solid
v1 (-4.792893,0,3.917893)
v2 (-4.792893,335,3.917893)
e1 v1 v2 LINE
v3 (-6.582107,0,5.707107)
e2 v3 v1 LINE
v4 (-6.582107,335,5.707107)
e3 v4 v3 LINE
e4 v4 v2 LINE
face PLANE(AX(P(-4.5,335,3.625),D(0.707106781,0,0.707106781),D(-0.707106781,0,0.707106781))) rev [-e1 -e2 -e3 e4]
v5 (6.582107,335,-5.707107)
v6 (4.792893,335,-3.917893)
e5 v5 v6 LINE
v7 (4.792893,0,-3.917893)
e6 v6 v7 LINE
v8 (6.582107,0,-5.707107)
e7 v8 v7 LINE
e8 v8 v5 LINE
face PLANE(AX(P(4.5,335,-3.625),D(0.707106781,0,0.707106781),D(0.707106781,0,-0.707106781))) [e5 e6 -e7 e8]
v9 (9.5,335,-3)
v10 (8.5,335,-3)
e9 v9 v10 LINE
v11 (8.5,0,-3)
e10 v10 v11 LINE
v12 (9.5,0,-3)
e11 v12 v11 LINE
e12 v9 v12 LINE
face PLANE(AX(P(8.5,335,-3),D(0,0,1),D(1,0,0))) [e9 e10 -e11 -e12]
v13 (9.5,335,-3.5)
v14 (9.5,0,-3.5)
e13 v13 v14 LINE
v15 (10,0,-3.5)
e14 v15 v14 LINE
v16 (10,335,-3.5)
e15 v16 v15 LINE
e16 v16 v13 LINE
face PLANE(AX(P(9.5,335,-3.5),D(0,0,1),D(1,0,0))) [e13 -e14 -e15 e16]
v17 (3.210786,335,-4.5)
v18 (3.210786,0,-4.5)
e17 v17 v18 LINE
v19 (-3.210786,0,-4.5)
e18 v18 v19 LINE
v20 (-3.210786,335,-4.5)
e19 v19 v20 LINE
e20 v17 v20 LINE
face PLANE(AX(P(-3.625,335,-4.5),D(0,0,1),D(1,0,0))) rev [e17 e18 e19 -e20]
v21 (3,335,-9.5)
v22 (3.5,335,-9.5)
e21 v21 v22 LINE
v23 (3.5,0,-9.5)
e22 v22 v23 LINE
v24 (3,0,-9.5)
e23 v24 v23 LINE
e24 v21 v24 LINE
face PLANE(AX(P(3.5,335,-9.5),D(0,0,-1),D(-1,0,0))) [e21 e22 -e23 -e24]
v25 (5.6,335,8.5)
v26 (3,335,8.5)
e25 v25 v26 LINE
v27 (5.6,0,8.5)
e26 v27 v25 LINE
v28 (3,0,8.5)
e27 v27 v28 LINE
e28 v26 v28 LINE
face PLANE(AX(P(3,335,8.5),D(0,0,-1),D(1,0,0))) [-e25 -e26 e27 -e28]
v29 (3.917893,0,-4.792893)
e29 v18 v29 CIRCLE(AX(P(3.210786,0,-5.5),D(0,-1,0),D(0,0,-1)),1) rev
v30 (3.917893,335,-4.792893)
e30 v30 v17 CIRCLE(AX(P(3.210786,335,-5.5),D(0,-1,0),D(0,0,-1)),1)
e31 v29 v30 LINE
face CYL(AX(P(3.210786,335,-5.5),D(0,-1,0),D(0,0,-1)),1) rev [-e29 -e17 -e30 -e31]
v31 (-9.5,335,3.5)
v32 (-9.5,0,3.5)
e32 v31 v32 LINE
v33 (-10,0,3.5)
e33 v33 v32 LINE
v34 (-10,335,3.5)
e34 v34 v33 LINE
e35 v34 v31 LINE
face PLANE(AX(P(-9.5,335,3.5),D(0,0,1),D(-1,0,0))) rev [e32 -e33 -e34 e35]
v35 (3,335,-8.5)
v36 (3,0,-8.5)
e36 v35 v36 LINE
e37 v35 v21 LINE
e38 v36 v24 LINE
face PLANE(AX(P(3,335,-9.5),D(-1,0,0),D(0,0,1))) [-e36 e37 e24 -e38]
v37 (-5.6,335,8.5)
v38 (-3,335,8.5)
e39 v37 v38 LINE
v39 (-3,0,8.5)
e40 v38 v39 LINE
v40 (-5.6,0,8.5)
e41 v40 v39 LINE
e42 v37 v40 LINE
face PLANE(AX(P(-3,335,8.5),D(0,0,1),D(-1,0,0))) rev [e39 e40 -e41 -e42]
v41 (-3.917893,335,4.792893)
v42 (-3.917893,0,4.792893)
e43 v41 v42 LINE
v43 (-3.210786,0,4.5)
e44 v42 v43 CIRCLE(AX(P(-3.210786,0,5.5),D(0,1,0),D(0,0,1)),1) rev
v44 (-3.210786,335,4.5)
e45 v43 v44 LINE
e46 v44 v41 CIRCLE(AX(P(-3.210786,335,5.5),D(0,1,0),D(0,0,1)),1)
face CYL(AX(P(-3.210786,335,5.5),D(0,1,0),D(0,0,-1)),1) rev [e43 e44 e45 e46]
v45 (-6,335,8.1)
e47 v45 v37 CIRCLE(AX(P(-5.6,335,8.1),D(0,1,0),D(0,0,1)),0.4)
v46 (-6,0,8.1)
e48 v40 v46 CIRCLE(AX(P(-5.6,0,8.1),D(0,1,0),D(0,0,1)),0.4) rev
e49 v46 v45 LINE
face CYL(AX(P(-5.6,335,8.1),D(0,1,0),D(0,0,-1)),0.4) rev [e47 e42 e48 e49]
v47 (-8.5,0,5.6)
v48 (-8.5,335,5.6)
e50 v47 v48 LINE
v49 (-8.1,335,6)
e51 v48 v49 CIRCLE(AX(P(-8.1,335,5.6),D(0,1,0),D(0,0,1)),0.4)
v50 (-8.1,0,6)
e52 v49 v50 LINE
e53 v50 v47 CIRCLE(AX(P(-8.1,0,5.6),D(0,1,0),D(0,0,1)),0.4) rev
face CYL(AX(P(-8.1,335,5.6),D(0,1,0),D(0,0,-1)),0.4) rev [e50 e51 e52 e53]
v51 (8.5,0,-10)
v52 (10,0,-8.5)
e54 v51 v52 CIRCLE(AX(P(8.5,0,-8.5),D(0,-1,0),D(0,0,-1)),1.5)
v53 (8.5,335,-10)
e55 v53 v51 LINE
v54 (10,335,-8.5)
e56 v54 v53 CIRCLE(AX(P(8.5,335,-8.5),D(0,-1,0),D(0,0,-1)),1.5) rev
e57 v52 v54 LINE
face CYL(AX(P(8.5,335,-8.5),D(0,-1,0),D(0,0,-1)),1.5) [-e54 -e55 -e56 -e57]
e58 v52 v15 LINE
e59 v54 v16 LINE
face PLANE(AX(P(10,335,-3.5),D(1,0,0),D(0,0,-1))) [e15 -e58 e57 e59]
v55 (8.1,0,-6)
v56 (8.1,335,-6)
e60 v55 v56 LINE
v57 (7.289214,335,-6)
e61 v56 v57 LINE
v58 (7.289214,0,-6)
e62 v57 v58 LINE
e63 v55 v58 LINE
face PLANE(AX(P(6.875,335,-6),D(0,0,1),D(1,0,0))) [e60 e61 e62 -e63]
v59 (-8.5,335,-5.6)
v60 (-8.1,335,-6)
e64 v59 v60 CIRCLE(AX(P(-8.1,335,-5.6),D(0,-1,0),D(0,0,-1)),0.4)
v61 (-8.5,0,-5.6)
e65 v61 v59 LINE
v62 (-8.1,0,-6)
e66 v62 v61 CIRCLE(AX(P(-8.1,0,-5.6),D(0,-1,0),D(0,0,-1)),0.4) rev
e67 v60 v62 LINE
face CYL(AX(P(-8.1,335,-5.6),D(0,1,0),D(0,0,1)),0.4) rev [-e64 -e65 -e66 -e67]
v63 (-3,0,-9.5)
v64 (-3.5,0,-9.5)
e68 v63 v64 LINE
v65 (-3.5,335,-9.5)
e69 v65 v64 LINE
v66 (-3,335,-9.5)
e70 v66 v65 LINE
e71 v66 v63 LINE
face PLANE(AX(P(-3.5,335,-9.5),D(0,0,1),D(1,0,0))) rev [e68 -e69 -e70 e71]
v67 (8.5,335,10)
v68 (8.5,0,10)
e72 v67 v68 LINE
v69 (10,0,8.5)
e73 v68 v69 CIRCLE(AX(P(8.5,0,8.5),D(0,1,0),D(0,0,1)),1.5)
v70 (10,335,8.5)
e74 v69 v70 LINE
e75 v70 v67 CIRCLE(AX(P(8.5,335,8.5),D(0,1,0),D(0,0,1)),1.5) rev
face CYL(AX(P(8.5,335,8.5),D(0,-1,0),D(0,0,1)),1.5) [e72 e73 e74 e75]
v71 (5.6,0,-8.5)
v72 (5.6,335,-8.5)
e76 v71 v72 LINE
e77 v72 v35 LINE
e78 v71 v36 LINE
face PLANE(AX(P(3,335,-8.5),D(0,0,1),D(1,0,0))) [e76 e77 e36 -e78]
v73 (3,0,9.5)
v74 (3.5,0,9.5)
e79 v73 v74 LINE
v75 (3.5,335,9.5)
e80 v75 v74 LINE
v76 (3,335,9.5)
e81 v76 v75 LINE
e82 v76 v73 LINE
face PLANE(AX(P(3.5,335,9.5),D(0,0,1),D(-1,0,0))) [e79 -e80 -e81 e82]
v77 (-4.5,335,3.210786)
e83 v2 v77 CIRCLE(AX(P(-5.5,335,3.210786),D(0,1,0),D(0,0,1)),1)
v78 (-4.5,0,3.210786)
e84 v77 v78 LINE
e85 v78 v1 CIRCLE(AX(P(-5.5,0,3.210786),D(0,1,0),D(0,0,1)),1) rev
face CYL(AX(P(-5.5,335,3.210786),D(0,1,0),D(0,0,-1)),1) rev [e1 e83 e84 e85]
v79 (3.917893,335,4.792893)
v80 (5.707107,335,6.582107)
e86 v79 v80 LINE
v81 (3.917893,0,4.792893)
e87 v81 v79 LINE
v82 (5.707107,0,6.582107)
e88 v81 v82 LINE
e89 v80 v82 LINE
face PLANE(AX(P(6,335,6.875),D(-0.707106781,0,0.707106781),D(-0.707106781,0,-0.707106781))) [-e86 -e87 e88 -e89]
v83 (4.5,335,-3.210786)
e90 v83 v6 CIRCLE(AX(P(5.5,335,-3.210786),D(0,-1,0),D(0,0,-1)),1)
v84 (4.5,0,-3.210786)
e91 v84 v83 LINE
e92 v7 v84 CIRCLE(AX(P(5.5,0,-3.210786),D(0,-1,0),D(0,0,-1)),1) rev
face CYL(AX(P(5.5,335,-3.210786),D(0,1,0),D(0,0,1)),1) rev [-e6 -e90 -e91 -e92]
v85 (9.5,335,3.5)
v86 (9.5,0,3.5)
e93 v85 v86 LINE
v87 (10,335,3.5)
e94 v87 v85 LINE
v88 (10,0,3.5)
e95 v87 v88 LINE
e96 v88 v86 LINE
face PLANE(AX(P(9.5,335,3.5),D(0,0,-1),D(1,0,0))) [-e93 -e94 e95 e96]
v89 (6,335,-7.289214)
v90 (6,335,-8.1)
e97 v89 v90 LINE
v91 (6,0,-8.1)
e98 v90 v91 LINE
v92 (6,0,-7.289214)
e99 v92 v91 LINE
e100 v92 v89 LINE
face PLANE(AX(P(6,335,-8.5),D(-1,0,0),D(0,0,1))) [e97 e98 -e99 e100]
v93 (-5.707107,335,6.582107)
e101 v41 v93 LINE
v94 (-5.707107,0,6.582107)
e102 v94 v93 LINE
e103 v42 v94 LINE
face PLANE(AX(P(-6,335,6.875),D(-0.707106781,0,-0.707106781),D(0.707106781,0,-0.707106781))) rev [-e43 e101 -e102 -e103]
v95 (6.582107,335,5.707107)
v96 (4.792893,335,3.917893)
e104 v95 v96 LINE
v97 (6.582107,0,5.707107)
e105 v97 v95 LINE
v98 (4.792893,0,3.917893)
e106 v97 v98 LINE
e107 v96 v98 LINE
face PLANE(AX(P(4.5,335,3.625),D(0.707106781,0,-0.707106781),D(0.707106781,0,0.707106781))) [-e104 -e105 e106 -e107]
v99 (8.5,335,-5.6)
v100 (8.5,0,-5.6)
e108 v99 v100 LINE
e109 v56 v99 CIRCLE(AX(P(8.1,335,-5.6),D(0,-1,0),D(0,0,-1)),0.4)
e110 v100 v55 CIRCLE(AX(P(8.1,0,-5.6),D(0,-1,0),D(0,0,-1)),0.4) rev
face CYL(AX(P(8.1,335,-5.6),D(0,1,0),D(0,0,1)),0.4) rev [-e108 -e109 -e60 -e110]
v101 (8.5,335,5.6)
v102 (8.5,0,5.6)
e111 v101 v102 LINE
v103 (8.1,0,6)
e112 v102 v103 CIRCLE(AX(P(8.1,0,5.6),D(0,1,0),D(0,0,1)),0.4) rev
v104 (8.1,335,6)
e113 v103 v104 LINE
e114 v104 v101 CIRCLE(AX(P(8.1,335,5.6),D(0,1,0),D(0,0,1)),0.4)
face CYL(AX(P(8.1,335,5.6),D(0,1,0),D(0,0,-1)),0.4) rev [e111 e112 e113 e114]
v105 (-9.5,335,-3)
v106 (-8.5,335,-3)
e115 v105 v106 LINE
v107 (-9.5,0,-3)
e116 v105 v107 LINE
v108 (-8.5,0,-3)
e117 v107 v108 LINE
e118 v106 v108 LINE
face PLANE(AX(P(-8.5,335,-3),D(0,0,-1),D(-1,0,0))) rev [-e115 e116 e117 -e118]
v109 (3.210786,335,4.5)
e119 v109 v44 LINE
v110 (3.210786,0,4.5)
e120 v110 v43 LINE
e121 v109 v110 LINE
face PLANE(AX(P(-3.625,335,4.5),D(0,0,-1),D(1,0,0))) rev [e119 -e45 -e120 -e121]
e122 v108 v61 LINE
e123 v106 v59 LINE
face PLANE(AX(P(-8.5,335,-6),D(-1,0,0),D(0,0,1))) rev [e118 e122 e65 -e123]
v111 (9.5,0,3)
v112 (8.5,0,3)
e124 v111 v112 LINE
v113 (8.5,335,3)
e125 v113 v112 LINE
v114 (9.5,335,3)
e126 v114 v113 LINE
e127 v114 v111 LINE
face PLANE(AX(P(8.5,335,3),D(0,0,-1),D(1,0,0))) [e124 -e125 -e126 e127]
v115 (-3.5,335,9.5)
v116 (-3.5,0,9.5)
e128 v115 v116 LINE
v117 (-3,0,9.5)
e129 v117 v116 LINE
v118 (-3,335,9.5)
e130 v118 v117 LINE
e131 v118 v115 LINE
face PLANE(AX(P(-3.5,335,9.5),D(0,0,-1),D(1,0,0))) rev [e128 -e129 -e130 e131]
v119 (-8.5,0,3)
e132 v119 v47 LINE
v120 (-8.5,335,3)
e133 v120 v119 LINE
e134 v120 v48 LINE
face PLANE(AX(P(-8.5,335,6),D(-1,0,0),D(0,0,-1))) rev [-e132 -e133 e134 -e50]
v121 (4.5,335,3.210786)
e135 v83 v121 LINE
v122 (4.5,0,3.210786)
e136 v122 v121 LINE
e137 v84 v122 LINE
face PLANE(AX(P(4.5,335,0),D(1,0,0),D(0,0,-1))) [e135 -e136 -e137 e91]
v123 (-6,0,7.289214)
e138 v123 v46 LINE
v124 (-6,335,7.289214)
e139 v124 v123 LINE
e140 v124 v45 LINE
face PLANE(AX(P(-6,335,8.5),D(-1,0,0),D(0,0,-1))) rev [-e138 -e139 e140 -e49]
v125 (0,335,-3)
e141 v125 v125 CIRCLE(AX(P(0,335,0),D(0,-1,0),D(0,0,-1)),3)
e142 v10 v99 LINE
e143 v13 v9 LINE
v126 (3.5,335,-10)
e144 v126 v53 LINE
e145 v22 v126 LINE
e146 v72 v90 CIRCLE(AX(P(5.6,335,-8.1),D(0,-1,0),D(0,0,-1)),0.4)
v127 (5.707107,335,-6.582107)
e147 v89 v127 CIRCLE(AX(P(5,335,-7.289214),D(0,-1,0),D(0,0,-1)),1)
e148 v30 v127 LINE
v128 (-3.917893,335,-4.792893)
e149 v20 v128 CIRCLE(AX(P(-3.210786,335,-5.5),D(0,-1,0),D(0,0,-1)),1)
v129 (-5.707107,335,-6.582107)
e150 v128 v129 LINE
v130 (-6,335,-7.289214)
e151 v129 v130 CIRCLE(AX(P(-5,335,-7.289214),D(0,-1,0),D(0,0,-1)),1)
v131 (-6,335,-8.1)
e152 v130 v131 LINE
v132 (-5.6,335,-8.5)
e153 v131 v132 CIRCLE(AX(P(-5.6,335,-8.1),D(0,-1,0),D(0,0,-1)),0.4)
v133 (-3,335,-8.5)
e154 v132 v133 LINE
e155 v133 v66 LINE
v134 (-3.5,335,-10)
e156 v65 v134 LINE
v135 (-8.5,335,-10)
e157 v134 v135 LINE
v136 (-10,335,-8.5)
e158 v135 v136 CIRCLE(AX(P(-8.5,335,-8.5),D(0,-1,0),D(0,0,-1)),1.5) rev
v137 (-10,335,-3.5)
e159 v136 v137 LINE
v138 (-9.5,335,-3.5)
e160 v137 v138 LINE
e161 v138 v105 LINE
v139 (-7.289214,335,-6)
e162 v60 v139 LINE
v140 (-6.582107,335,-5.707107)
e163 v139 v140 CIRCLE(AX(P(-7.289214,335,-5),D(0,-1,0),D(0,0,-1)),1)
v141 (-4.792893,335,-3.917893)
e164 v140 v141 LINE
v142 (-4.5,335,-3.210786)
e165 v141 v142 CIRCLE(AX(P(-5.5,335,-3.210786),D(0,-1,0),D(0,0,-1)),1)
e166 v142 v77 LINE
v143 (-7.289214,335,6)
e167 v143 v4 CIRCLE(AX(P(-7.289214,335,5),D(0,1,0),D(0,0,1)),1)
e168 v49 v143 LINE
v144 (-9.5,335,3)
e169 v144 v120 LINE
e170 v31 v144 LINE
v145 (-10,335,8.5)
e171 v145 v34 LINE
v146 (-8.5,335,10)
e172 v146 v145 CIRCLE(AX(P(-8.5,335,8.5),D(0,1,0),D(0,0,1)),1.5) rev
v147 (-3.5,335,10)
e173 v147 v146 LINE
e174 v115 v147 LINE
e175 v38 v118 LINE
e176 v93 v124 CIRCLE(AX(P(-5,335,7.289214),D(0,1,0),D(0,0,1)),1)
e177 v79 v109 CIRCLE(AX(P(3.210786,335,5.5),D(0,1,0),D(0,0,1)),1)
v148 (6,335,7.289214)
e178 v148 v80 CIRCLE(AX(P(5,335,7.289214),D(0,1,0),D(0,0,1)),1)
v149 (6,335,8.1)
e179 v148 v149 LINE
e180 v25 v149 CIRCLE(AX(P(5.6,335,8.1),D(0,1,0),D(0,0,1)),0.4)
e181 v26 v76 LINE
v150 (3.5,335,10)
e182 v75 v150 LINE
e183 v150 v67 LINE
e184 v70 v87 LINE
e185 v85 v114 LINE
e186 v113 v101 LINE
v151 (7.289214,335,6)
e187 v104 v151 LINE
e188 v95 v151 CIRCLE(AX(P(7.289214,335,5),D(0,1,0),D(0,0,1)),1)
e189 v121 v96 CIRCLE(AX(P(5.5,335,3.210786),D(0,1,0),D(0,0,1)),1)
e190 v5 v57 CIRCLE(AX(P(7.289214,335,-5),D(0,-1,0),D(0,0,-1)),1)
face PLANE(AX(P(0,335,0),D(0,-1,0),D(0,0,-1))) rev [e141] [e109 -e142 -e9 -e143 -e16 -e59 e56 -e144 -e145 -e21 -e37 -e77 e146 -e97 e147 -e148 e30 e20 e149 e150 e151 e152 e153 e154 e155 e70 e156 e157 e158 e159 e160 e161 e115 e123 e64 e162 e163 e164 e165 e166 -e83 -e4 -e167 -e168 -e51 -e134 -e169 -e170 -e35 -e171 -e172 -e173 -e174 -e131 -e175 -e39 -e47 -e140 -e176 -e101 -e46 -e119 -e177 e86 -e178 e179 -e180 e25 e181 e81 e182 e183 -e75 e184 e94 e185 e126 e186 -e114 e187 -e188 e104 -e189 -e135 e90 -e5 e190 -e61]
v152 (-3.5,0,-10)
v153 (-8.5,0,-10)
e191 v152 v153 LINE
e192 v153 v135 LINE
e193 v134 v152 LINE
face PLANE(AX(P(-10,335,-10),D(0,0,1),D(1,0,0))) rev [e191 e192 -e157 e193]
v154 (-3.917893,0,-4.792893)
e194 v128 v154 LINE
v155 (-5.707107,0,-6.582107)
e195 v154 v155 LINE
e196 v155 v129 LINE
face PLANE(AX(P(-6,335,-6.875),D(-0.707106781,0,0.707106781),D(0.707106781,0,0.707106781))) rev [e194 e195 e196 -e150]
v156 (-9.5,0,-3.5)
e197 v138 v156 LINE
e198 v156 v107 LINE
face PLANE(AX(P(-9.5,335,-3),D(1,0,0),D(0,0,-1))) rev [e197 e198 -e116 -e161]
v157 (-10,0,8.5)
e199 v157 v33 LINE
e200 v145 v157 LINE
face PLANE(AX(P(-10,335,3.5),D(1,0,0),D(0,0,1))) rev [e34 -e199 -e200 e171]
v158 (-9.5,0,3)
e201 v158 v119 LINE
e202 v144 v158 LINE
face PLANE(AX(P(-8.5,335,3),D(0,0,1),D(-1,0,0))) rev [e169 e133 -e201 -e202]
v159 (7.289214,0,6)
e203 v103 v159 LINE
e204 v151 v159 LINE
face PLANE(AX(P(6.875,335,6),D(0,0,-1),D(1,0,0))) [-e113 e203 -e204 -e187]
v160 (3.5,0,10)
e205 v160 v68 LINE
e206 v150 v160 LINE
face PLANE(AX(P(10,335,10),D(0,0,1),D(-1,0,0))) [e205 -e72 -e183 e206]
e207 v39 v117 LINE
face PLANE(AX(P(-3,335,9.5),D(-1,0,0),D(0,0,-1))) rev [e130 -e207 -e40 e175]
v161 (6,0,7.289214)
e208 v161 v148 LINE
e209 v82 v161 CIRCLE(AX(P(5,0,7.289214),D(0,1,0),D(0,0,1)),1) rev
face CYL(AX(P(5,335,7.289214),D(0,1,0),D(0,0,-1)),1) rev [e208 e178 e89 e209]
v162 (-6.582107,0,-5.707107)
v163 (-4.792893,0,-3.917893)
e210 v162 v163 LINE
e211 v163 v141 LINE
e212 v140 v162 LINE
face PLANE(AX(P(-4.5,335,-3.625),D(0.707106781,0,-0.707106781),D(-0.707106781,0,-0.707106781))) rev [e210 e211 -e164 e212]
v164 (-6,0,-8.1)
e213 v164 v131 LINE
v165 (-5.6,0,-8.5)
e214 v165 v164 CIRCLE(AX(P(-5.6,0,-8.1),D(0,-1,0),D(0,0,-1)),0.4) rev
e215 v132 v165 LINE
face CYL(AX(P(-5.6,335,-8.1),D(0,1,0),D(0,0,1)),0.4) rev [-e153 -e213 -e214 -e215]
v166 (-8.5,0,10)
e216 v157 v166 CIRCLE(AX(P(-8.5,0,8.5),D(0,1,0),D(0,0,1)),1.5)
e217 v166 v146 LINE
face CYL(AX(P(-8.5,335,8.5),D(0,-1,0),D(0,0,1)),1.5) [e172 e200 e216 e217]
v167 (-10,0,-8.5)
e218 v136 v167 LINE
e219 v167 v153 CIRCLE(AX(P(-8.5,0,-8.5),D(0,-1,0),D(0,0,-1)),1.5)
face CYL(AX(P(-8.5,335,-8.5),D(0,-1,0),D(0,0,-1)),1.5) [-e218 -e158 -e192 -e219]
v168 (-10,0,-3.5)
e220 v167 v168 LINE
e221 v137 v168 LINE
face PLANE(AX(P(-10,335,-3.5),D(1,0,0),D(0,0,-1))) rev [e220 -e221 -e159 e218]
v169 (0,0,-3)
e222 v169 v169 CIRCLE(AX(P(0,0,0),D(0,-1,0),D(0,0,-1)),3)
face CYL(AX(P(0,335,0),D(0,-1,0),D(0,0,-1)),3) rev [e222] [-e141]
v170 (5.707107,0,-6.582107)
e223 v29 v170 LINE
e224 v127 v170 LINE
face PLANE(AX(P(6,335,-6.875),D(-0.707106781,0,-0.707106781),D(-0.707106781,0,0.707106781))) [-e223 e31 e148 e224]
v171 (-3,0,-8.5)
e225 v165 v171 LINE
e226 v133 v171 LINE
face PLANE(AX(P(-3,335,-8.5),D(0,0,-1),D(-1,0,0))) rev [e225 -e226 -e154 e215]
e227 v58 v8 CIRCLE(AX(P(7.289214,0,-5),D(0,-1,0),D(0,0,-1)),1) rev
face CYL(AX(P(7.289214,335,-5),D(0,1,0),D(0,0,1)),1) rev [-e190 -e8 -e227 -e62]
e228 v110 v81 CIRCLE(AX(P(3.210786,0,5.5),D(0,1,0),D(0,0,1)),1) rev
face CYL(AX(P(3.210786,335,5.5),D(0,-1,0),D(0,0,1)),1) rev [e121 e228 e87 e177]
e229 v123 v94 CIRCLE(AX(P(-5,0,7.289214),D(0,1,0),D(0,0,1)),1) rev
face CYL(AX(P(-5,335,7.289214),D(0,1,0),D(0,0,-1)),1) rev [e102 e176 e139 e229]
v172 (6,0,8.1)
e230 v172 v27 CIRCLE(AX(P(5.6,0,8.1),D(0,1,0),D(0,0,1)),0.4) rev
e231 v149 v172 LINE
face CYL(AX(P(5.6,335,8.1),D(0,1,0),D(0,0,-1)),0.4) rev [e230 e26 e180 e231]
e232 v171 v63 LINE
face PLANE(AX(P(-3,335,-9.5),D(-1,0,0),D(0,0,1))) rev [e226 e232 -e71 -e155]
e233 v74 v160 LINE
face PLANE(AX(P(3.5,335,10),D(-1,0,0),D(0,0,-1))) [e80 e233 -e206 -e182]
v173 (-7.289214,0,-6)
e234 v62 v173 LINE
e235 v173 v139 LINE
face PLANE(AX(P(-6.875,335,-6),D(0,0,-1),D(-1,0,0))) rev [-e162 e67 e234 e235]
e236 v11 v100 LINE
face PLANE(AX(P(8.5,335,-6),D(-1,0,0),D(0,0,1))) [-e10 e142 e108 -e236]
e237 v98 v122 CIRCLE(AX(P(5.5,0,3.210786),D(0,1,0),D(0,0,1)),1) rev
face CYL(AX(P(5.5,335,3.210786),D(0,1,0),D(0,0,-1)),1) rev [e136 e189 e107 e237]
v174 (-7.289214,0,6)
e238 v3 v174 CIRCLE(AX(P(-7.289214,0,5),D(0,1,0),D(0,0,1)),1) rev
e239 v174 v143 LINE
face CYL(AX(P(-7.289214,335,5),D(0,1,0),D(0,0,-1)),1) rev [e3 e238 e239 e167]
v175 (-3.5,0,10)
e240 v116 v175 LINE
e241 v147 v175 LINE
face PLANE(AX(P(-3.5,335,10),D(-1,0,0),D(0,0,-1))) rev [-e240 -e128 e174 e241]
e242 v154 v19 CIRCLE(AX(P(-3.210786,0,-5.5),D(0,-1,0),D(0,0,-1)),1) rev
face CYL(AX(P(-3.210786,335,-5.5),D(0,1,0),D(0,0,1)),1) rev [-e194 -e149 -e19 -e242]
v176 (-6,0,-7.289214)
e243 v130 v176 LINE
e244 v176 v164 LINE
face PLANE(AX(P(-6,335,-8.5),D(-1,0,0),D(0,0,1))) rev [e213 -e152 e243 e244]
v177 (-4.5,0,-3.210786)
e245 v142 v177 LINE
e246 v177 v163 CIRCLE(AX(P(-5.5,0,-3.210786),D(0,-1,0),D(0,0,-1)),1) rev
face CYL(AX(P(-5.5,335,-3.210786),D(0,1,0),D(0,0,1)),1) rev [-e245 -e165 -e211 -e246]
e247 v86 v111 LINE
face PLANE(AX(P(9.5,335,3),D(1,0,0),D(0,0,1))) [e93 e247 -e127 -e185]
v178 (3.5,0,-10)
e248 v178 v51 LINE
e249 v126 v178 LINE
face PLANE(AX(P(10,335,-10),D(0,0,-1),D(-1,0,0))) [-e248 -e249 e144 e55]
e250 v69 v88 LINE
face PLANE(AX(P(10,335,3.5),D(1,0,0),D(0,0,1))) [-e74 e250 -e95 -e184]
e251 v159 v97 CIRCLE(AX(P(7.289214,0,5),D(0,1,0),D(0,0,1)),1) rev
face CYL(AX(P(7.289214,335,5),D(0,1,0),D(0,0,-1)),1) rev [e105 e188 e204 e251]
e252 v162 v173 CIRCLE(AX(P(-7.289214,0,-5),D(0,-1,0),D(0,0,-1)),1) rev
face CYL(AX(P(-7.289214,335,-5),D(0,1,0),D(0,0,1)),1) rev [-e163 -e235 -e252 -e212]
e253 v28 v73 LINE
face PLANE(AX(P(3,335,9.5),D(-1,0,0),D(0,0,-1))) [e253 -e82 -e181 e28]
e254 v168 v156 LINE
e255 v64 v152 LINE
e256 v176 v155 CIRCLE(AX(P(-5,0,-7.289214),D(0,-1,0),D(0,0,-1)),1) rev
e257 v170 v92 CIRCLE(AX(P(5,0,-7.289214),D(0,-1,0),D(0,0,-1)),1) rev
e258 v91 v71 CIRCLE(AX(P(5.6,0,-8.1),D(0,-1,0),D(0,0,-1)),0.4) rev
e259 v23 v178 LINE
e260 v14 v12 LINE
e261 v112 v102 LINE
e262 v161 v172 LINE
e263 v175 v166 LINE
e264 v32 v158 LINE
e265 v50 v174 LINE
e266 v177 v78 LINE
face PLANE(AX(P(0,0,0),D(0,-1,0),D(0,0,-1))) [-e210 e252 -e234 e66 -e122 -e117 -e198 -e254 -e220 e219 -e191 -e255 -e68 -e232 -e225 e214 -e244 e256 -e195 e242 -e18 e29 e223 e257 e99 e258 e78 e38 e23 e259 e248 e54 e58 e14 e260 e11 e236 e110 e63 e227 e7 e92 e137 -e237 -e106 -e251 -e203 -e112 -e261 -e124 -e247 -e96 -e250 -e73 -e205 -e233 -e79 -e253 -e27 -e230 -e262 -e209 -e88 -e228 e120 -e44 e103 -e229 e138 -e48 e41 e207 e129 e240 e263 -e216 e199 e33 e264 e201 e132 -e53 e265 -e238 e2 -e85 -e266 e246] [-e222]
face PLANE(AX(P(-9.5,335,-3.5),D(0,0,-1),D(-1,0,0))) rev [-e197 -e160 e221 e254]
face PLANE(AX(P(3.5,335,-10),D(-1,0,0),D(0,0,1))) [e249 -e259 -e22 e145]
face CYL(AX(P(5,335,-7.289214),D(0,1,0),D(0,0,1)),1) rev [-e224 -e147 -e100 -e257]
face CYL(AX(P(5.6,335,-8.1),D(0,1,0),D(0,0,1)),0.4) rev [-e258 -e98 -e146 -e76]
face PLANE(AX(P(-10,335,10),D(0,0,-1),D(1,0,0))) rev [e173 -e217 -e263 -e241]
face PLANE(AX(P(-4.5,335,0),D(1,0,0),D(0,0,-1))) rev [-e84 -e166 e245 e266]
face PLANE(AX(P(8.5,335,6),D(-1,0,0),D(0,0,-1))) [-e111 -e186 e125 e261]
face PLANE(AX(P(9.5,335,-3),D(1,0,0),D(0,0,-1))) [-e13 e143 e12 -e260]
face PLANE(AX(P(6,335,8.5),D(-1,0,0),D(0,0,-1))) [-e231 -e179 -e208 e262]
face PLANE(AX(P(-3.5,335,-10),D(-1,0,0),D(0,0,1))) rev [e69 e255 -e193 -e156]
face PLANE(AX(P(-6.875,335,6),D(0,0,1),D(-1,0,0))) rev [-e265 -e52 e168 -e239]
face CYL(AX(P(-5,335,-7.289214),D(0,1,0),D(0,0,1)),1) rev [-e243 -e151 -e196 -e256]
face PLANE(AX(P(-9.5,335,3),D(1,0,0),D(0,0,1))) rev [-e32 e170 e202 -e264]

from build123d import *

# Parameters (mm, degrees)
BOSS_EXTRU_1_CORPS_DEPTH    = 335
CONG_1_R                    = 1.5
CONG_2_R                    = 0.4
CONG_4_R                    = 1
CONG_1_OF_SYM_TRIE_BRAS_R   = 1.5
CONG_2_OF_SYM_TRIE_BRAS_R   = 0.4
CONG_4_OF_SYM_TRIE_BRAS_R   = 1
SYM_TRIE_BRAS_DOUBLE_DEPTH  = 335
APR_S_TARODAGE_M6_R         = 3
ENL_V_MAT_FILETAGE_M6_DEPTH = 336.298374586


# Read off the part's stored shape, not the designer's step: Symétrie Bras double
with BuildPart() as part:
    # Esquisse4 → Boss.-Extru.1 Corps (new body)
    with BuildSketch(Plane(origin=(0, 0, 0), x_dir=(1, 0, 0), z_dir=(0, 1, 0))):
        Polygon((0, 0), (-4.5, 0), (-4.5, 3.625), (-6.875, 6), (-8.5, 6), (-8.5, 3), (-9.5, 3), (-9.5, 3.5), (-10, 3.5), (-10, 10), (-3.5, 10), (-3.5, 9.5), (-3, 9.5), (-3, 8.5), (-6, 8.5), (-6, 6.875), (-3.625, 4.5), (0, 4.5), align=None)
    boss_extru_1_corps = extrude(amount=BOSS_EXTRU_1_CORPS_DEPTH)

    # Congé1
    cong_1_edges = [part.edges().sort_by_distance(p)[0] for p in [
        (-10, 167.5, -10),
    ]]
    fillet(cong_1_edges, radius=CONG_1_R)

    # Congé2
    cong_2_edges = [part.edges().sort_by_distance(p)[0] for p in [
        (-8.5, 167.5, -6),
        (-6, 167.5, -8.5),
    ]]
    fillet(cong_2_edges, radius=CONG_2_R)

    # Congé4
    cong_4_edges = [part.edges().sort_by_distance(p)[0] for p in [
        (-4.5, 167.5, -3.625),
        (-6.875, 167.5, -6),
        (-6, 167.5, -6.875),
        (-3.625, 167.5, -4.5),
    ]]
    fillet(cong_4_edges, radius=CONG_4_R)

    # Symétrie Bras: Boss.-Extru.1 Corps across plane
    add(boss_extru_1_corps.mirror(Plane(origin=(0, 335, -4.5), x_dir=(0, 0, 1), z_dir=(-1, 0, 0))))

    # Congé1 of Symétrie Bras
    cong_1_of_sym_trie_bras_edges = [part.edges().sort_by_distance(p)[0] for p in [
        (10, 167.5, -10),
    ]]
    fillet(cong_1_of_sym_trie_bras_edges, radius=CONG_1_OF_SYM_TRIE_BRAS_R)

    # Congé2 of Symétrie Bras
    cong_2_of_sym_trie_bras_edges = [part.edges().sort_by_distance(p)[0] for p in [
        (8.5, 167.5, -6),
        (6, 167.5, -8.5),
    ]]
    fillet(cong_2_of_sym_trie_bras_edges, radius=CONG_2_OF_SYM_TRIE_BRAS_R)

    # Congé4 of Symétrie Bras
    cong_4_of_sym_trie_bras_edges = [part.edges().sort_by_distance(p)[0] for p in [
        (4.5, 167.5, -3.625),
        (6.875, 167.5, -6),
        (6, 167.5, -6.875),
        (3.625, 167.5, -4.5),
    ]]
    fillet(cong_4_of_sym_trie_bras_edges, radius=CONG_4_OF_SYM_TRIE_BRAS_R)

    # Symétrie Bras double outline → Symétrie Bras double (add)
    with BuildSketch(Plane(origin=(0, 0, 0), x_dir=(1, 0, 0), z_dir=(0, 1, 0))):
        with BuildLine():
            ThreePointArc((7.289213562, -6), (6.90653013, -5.923879533), (6.582106781, -5.707106781))
            Line((6.582106781, -5.707106781), (4.792893219, -3.917893219))
            ThreePointArc((4.792893219, -3.917893219), (4.576120467, -3.59346987), (4.5, -3.210786438))
            Line((4.5, -3.210786438), (4.5, 0))
            Line((4.5, 0), (-4.5, 0))
            Line((-4.5, 0), (-4.5, -3.210786438))
            ThreePointArc((-4.5, -3.210786438), (-4.576120467, -3.59346987), (-4.792893219, -3.917893219))
            Line((-4.792893219, -3.917893219), (-6.582106781, -5.707106781))
            ThreePointArc((-6.582106781, -5.707106781), (-6.90653013, -5.923879533), (-7.289213562, -6))
            Line((-7.289213562, -6), (-8.1, -6))
            ThreePointArc((-8.1, -6), (-8.382842712, -5.882842712), (-8.5, -5.6))
            Line((-8.5, -5.6), (-8.5, -3))
            Line((-8.5, -3), (-9.5, -3))
            Line((-9.5, -3), (-9.5, -3.5))
            Line((-9.5, -3.5), (-10, -3.5))
            Line((-10, -3.5), (-10, -8.5))
            ThreePointArc((-10, -8.5), (-9.560660172, -9.560660172), (-8.5, -10))
            Line((-8.5, -10), (-3.5, -10))
            Line((-3.5, -10), (-3.5, -9.5))
            Line((-3.5, -9.5), (-3, -9.5))
            Line((-3, -9.5), (-3, -8.5))
            Line((-3, -8.5), (-5.6, -8.5))
            ThreePointArc((-5.6, -8.5), (-5.882842712, -8.382842712), (-6, -8.1))
            Line((-6, -8.1), (-6, -7.289213562))
            ThreePointArc((-6, -7.289213562), (-5.923879533, -6.90653013), (-5.707106781, -6.582106781))
            Line((-5.707106781, -6.582106781), (-3.917893219, -4.792893219))
            ThreePointArc((-3.917893219, -4.792893219), (-3.59346987, -4.576120467), (-3.210786438, -4.5))
            Line((-3.210786438, -4.5), (3.210786438, -4.5))
            ThreePointArc((3.210786438, -4.5), (3.59346987, -4.576120467), (3.917893219, -4.792893219))
            Line((3.917893219, -4.792893219), (5.707106781, -6.582106781))
            ThreePointArc((5.707106781, -6.582106781), (5.923879533, -6.90653013), (6, -7.289213562))
            Line((6, -7.289213562), (6, -8.1))
            ThreePointArc((6, -8.1), (5.882842712, -8.382842712), (5.6, -8.5))
            Line((5.6, -8.5), (3, -8.5))
            Line((3, -8.5), (3, -9.5))
            Line((3, -9.5), (3.5, -9.5))
            Line((3.5, -9.5), (3.5, -10))
            Line((3.5, -10), (8.5, -10))
            ThreePointArc((8.5, -10), (9.560660172, -9.560660172), (10, -8.5))
            Line((10, -8.5), (10, -3.5))
            Line((10, -3.5), (9.5, -3.5))
            Line((9.5, -3.5), (9.5, -3))
            Line((9.5, -3), (8.5, -3))
            Line((8.5, -3), (8.5, -5.6))
            ThreePointArc((8.5, -5.6), (8.382842712, -5.882842712), (8.1, -6))
            Line((8.1, -6), (7.289213562, -6))
        make_face()
    extrude(amount=SYM_TRIE_BRAS_DOUBLE_DEPTH)

    # Après tarodage M6 → Enlèv. mat.-Filetage M6 (cut, through all)
    with BuildSketch(Plane.XZ):
        with Locations(Location((0, 0, 0), (0, 0, 270))):
            Circle(APR_S_TARODAGE_M6_R)
    extrude(amount=-ENL_V_MAT_FILETAGE_M6_DEPTH, mode=Mode.SUBTRACT)


solid = part.part
